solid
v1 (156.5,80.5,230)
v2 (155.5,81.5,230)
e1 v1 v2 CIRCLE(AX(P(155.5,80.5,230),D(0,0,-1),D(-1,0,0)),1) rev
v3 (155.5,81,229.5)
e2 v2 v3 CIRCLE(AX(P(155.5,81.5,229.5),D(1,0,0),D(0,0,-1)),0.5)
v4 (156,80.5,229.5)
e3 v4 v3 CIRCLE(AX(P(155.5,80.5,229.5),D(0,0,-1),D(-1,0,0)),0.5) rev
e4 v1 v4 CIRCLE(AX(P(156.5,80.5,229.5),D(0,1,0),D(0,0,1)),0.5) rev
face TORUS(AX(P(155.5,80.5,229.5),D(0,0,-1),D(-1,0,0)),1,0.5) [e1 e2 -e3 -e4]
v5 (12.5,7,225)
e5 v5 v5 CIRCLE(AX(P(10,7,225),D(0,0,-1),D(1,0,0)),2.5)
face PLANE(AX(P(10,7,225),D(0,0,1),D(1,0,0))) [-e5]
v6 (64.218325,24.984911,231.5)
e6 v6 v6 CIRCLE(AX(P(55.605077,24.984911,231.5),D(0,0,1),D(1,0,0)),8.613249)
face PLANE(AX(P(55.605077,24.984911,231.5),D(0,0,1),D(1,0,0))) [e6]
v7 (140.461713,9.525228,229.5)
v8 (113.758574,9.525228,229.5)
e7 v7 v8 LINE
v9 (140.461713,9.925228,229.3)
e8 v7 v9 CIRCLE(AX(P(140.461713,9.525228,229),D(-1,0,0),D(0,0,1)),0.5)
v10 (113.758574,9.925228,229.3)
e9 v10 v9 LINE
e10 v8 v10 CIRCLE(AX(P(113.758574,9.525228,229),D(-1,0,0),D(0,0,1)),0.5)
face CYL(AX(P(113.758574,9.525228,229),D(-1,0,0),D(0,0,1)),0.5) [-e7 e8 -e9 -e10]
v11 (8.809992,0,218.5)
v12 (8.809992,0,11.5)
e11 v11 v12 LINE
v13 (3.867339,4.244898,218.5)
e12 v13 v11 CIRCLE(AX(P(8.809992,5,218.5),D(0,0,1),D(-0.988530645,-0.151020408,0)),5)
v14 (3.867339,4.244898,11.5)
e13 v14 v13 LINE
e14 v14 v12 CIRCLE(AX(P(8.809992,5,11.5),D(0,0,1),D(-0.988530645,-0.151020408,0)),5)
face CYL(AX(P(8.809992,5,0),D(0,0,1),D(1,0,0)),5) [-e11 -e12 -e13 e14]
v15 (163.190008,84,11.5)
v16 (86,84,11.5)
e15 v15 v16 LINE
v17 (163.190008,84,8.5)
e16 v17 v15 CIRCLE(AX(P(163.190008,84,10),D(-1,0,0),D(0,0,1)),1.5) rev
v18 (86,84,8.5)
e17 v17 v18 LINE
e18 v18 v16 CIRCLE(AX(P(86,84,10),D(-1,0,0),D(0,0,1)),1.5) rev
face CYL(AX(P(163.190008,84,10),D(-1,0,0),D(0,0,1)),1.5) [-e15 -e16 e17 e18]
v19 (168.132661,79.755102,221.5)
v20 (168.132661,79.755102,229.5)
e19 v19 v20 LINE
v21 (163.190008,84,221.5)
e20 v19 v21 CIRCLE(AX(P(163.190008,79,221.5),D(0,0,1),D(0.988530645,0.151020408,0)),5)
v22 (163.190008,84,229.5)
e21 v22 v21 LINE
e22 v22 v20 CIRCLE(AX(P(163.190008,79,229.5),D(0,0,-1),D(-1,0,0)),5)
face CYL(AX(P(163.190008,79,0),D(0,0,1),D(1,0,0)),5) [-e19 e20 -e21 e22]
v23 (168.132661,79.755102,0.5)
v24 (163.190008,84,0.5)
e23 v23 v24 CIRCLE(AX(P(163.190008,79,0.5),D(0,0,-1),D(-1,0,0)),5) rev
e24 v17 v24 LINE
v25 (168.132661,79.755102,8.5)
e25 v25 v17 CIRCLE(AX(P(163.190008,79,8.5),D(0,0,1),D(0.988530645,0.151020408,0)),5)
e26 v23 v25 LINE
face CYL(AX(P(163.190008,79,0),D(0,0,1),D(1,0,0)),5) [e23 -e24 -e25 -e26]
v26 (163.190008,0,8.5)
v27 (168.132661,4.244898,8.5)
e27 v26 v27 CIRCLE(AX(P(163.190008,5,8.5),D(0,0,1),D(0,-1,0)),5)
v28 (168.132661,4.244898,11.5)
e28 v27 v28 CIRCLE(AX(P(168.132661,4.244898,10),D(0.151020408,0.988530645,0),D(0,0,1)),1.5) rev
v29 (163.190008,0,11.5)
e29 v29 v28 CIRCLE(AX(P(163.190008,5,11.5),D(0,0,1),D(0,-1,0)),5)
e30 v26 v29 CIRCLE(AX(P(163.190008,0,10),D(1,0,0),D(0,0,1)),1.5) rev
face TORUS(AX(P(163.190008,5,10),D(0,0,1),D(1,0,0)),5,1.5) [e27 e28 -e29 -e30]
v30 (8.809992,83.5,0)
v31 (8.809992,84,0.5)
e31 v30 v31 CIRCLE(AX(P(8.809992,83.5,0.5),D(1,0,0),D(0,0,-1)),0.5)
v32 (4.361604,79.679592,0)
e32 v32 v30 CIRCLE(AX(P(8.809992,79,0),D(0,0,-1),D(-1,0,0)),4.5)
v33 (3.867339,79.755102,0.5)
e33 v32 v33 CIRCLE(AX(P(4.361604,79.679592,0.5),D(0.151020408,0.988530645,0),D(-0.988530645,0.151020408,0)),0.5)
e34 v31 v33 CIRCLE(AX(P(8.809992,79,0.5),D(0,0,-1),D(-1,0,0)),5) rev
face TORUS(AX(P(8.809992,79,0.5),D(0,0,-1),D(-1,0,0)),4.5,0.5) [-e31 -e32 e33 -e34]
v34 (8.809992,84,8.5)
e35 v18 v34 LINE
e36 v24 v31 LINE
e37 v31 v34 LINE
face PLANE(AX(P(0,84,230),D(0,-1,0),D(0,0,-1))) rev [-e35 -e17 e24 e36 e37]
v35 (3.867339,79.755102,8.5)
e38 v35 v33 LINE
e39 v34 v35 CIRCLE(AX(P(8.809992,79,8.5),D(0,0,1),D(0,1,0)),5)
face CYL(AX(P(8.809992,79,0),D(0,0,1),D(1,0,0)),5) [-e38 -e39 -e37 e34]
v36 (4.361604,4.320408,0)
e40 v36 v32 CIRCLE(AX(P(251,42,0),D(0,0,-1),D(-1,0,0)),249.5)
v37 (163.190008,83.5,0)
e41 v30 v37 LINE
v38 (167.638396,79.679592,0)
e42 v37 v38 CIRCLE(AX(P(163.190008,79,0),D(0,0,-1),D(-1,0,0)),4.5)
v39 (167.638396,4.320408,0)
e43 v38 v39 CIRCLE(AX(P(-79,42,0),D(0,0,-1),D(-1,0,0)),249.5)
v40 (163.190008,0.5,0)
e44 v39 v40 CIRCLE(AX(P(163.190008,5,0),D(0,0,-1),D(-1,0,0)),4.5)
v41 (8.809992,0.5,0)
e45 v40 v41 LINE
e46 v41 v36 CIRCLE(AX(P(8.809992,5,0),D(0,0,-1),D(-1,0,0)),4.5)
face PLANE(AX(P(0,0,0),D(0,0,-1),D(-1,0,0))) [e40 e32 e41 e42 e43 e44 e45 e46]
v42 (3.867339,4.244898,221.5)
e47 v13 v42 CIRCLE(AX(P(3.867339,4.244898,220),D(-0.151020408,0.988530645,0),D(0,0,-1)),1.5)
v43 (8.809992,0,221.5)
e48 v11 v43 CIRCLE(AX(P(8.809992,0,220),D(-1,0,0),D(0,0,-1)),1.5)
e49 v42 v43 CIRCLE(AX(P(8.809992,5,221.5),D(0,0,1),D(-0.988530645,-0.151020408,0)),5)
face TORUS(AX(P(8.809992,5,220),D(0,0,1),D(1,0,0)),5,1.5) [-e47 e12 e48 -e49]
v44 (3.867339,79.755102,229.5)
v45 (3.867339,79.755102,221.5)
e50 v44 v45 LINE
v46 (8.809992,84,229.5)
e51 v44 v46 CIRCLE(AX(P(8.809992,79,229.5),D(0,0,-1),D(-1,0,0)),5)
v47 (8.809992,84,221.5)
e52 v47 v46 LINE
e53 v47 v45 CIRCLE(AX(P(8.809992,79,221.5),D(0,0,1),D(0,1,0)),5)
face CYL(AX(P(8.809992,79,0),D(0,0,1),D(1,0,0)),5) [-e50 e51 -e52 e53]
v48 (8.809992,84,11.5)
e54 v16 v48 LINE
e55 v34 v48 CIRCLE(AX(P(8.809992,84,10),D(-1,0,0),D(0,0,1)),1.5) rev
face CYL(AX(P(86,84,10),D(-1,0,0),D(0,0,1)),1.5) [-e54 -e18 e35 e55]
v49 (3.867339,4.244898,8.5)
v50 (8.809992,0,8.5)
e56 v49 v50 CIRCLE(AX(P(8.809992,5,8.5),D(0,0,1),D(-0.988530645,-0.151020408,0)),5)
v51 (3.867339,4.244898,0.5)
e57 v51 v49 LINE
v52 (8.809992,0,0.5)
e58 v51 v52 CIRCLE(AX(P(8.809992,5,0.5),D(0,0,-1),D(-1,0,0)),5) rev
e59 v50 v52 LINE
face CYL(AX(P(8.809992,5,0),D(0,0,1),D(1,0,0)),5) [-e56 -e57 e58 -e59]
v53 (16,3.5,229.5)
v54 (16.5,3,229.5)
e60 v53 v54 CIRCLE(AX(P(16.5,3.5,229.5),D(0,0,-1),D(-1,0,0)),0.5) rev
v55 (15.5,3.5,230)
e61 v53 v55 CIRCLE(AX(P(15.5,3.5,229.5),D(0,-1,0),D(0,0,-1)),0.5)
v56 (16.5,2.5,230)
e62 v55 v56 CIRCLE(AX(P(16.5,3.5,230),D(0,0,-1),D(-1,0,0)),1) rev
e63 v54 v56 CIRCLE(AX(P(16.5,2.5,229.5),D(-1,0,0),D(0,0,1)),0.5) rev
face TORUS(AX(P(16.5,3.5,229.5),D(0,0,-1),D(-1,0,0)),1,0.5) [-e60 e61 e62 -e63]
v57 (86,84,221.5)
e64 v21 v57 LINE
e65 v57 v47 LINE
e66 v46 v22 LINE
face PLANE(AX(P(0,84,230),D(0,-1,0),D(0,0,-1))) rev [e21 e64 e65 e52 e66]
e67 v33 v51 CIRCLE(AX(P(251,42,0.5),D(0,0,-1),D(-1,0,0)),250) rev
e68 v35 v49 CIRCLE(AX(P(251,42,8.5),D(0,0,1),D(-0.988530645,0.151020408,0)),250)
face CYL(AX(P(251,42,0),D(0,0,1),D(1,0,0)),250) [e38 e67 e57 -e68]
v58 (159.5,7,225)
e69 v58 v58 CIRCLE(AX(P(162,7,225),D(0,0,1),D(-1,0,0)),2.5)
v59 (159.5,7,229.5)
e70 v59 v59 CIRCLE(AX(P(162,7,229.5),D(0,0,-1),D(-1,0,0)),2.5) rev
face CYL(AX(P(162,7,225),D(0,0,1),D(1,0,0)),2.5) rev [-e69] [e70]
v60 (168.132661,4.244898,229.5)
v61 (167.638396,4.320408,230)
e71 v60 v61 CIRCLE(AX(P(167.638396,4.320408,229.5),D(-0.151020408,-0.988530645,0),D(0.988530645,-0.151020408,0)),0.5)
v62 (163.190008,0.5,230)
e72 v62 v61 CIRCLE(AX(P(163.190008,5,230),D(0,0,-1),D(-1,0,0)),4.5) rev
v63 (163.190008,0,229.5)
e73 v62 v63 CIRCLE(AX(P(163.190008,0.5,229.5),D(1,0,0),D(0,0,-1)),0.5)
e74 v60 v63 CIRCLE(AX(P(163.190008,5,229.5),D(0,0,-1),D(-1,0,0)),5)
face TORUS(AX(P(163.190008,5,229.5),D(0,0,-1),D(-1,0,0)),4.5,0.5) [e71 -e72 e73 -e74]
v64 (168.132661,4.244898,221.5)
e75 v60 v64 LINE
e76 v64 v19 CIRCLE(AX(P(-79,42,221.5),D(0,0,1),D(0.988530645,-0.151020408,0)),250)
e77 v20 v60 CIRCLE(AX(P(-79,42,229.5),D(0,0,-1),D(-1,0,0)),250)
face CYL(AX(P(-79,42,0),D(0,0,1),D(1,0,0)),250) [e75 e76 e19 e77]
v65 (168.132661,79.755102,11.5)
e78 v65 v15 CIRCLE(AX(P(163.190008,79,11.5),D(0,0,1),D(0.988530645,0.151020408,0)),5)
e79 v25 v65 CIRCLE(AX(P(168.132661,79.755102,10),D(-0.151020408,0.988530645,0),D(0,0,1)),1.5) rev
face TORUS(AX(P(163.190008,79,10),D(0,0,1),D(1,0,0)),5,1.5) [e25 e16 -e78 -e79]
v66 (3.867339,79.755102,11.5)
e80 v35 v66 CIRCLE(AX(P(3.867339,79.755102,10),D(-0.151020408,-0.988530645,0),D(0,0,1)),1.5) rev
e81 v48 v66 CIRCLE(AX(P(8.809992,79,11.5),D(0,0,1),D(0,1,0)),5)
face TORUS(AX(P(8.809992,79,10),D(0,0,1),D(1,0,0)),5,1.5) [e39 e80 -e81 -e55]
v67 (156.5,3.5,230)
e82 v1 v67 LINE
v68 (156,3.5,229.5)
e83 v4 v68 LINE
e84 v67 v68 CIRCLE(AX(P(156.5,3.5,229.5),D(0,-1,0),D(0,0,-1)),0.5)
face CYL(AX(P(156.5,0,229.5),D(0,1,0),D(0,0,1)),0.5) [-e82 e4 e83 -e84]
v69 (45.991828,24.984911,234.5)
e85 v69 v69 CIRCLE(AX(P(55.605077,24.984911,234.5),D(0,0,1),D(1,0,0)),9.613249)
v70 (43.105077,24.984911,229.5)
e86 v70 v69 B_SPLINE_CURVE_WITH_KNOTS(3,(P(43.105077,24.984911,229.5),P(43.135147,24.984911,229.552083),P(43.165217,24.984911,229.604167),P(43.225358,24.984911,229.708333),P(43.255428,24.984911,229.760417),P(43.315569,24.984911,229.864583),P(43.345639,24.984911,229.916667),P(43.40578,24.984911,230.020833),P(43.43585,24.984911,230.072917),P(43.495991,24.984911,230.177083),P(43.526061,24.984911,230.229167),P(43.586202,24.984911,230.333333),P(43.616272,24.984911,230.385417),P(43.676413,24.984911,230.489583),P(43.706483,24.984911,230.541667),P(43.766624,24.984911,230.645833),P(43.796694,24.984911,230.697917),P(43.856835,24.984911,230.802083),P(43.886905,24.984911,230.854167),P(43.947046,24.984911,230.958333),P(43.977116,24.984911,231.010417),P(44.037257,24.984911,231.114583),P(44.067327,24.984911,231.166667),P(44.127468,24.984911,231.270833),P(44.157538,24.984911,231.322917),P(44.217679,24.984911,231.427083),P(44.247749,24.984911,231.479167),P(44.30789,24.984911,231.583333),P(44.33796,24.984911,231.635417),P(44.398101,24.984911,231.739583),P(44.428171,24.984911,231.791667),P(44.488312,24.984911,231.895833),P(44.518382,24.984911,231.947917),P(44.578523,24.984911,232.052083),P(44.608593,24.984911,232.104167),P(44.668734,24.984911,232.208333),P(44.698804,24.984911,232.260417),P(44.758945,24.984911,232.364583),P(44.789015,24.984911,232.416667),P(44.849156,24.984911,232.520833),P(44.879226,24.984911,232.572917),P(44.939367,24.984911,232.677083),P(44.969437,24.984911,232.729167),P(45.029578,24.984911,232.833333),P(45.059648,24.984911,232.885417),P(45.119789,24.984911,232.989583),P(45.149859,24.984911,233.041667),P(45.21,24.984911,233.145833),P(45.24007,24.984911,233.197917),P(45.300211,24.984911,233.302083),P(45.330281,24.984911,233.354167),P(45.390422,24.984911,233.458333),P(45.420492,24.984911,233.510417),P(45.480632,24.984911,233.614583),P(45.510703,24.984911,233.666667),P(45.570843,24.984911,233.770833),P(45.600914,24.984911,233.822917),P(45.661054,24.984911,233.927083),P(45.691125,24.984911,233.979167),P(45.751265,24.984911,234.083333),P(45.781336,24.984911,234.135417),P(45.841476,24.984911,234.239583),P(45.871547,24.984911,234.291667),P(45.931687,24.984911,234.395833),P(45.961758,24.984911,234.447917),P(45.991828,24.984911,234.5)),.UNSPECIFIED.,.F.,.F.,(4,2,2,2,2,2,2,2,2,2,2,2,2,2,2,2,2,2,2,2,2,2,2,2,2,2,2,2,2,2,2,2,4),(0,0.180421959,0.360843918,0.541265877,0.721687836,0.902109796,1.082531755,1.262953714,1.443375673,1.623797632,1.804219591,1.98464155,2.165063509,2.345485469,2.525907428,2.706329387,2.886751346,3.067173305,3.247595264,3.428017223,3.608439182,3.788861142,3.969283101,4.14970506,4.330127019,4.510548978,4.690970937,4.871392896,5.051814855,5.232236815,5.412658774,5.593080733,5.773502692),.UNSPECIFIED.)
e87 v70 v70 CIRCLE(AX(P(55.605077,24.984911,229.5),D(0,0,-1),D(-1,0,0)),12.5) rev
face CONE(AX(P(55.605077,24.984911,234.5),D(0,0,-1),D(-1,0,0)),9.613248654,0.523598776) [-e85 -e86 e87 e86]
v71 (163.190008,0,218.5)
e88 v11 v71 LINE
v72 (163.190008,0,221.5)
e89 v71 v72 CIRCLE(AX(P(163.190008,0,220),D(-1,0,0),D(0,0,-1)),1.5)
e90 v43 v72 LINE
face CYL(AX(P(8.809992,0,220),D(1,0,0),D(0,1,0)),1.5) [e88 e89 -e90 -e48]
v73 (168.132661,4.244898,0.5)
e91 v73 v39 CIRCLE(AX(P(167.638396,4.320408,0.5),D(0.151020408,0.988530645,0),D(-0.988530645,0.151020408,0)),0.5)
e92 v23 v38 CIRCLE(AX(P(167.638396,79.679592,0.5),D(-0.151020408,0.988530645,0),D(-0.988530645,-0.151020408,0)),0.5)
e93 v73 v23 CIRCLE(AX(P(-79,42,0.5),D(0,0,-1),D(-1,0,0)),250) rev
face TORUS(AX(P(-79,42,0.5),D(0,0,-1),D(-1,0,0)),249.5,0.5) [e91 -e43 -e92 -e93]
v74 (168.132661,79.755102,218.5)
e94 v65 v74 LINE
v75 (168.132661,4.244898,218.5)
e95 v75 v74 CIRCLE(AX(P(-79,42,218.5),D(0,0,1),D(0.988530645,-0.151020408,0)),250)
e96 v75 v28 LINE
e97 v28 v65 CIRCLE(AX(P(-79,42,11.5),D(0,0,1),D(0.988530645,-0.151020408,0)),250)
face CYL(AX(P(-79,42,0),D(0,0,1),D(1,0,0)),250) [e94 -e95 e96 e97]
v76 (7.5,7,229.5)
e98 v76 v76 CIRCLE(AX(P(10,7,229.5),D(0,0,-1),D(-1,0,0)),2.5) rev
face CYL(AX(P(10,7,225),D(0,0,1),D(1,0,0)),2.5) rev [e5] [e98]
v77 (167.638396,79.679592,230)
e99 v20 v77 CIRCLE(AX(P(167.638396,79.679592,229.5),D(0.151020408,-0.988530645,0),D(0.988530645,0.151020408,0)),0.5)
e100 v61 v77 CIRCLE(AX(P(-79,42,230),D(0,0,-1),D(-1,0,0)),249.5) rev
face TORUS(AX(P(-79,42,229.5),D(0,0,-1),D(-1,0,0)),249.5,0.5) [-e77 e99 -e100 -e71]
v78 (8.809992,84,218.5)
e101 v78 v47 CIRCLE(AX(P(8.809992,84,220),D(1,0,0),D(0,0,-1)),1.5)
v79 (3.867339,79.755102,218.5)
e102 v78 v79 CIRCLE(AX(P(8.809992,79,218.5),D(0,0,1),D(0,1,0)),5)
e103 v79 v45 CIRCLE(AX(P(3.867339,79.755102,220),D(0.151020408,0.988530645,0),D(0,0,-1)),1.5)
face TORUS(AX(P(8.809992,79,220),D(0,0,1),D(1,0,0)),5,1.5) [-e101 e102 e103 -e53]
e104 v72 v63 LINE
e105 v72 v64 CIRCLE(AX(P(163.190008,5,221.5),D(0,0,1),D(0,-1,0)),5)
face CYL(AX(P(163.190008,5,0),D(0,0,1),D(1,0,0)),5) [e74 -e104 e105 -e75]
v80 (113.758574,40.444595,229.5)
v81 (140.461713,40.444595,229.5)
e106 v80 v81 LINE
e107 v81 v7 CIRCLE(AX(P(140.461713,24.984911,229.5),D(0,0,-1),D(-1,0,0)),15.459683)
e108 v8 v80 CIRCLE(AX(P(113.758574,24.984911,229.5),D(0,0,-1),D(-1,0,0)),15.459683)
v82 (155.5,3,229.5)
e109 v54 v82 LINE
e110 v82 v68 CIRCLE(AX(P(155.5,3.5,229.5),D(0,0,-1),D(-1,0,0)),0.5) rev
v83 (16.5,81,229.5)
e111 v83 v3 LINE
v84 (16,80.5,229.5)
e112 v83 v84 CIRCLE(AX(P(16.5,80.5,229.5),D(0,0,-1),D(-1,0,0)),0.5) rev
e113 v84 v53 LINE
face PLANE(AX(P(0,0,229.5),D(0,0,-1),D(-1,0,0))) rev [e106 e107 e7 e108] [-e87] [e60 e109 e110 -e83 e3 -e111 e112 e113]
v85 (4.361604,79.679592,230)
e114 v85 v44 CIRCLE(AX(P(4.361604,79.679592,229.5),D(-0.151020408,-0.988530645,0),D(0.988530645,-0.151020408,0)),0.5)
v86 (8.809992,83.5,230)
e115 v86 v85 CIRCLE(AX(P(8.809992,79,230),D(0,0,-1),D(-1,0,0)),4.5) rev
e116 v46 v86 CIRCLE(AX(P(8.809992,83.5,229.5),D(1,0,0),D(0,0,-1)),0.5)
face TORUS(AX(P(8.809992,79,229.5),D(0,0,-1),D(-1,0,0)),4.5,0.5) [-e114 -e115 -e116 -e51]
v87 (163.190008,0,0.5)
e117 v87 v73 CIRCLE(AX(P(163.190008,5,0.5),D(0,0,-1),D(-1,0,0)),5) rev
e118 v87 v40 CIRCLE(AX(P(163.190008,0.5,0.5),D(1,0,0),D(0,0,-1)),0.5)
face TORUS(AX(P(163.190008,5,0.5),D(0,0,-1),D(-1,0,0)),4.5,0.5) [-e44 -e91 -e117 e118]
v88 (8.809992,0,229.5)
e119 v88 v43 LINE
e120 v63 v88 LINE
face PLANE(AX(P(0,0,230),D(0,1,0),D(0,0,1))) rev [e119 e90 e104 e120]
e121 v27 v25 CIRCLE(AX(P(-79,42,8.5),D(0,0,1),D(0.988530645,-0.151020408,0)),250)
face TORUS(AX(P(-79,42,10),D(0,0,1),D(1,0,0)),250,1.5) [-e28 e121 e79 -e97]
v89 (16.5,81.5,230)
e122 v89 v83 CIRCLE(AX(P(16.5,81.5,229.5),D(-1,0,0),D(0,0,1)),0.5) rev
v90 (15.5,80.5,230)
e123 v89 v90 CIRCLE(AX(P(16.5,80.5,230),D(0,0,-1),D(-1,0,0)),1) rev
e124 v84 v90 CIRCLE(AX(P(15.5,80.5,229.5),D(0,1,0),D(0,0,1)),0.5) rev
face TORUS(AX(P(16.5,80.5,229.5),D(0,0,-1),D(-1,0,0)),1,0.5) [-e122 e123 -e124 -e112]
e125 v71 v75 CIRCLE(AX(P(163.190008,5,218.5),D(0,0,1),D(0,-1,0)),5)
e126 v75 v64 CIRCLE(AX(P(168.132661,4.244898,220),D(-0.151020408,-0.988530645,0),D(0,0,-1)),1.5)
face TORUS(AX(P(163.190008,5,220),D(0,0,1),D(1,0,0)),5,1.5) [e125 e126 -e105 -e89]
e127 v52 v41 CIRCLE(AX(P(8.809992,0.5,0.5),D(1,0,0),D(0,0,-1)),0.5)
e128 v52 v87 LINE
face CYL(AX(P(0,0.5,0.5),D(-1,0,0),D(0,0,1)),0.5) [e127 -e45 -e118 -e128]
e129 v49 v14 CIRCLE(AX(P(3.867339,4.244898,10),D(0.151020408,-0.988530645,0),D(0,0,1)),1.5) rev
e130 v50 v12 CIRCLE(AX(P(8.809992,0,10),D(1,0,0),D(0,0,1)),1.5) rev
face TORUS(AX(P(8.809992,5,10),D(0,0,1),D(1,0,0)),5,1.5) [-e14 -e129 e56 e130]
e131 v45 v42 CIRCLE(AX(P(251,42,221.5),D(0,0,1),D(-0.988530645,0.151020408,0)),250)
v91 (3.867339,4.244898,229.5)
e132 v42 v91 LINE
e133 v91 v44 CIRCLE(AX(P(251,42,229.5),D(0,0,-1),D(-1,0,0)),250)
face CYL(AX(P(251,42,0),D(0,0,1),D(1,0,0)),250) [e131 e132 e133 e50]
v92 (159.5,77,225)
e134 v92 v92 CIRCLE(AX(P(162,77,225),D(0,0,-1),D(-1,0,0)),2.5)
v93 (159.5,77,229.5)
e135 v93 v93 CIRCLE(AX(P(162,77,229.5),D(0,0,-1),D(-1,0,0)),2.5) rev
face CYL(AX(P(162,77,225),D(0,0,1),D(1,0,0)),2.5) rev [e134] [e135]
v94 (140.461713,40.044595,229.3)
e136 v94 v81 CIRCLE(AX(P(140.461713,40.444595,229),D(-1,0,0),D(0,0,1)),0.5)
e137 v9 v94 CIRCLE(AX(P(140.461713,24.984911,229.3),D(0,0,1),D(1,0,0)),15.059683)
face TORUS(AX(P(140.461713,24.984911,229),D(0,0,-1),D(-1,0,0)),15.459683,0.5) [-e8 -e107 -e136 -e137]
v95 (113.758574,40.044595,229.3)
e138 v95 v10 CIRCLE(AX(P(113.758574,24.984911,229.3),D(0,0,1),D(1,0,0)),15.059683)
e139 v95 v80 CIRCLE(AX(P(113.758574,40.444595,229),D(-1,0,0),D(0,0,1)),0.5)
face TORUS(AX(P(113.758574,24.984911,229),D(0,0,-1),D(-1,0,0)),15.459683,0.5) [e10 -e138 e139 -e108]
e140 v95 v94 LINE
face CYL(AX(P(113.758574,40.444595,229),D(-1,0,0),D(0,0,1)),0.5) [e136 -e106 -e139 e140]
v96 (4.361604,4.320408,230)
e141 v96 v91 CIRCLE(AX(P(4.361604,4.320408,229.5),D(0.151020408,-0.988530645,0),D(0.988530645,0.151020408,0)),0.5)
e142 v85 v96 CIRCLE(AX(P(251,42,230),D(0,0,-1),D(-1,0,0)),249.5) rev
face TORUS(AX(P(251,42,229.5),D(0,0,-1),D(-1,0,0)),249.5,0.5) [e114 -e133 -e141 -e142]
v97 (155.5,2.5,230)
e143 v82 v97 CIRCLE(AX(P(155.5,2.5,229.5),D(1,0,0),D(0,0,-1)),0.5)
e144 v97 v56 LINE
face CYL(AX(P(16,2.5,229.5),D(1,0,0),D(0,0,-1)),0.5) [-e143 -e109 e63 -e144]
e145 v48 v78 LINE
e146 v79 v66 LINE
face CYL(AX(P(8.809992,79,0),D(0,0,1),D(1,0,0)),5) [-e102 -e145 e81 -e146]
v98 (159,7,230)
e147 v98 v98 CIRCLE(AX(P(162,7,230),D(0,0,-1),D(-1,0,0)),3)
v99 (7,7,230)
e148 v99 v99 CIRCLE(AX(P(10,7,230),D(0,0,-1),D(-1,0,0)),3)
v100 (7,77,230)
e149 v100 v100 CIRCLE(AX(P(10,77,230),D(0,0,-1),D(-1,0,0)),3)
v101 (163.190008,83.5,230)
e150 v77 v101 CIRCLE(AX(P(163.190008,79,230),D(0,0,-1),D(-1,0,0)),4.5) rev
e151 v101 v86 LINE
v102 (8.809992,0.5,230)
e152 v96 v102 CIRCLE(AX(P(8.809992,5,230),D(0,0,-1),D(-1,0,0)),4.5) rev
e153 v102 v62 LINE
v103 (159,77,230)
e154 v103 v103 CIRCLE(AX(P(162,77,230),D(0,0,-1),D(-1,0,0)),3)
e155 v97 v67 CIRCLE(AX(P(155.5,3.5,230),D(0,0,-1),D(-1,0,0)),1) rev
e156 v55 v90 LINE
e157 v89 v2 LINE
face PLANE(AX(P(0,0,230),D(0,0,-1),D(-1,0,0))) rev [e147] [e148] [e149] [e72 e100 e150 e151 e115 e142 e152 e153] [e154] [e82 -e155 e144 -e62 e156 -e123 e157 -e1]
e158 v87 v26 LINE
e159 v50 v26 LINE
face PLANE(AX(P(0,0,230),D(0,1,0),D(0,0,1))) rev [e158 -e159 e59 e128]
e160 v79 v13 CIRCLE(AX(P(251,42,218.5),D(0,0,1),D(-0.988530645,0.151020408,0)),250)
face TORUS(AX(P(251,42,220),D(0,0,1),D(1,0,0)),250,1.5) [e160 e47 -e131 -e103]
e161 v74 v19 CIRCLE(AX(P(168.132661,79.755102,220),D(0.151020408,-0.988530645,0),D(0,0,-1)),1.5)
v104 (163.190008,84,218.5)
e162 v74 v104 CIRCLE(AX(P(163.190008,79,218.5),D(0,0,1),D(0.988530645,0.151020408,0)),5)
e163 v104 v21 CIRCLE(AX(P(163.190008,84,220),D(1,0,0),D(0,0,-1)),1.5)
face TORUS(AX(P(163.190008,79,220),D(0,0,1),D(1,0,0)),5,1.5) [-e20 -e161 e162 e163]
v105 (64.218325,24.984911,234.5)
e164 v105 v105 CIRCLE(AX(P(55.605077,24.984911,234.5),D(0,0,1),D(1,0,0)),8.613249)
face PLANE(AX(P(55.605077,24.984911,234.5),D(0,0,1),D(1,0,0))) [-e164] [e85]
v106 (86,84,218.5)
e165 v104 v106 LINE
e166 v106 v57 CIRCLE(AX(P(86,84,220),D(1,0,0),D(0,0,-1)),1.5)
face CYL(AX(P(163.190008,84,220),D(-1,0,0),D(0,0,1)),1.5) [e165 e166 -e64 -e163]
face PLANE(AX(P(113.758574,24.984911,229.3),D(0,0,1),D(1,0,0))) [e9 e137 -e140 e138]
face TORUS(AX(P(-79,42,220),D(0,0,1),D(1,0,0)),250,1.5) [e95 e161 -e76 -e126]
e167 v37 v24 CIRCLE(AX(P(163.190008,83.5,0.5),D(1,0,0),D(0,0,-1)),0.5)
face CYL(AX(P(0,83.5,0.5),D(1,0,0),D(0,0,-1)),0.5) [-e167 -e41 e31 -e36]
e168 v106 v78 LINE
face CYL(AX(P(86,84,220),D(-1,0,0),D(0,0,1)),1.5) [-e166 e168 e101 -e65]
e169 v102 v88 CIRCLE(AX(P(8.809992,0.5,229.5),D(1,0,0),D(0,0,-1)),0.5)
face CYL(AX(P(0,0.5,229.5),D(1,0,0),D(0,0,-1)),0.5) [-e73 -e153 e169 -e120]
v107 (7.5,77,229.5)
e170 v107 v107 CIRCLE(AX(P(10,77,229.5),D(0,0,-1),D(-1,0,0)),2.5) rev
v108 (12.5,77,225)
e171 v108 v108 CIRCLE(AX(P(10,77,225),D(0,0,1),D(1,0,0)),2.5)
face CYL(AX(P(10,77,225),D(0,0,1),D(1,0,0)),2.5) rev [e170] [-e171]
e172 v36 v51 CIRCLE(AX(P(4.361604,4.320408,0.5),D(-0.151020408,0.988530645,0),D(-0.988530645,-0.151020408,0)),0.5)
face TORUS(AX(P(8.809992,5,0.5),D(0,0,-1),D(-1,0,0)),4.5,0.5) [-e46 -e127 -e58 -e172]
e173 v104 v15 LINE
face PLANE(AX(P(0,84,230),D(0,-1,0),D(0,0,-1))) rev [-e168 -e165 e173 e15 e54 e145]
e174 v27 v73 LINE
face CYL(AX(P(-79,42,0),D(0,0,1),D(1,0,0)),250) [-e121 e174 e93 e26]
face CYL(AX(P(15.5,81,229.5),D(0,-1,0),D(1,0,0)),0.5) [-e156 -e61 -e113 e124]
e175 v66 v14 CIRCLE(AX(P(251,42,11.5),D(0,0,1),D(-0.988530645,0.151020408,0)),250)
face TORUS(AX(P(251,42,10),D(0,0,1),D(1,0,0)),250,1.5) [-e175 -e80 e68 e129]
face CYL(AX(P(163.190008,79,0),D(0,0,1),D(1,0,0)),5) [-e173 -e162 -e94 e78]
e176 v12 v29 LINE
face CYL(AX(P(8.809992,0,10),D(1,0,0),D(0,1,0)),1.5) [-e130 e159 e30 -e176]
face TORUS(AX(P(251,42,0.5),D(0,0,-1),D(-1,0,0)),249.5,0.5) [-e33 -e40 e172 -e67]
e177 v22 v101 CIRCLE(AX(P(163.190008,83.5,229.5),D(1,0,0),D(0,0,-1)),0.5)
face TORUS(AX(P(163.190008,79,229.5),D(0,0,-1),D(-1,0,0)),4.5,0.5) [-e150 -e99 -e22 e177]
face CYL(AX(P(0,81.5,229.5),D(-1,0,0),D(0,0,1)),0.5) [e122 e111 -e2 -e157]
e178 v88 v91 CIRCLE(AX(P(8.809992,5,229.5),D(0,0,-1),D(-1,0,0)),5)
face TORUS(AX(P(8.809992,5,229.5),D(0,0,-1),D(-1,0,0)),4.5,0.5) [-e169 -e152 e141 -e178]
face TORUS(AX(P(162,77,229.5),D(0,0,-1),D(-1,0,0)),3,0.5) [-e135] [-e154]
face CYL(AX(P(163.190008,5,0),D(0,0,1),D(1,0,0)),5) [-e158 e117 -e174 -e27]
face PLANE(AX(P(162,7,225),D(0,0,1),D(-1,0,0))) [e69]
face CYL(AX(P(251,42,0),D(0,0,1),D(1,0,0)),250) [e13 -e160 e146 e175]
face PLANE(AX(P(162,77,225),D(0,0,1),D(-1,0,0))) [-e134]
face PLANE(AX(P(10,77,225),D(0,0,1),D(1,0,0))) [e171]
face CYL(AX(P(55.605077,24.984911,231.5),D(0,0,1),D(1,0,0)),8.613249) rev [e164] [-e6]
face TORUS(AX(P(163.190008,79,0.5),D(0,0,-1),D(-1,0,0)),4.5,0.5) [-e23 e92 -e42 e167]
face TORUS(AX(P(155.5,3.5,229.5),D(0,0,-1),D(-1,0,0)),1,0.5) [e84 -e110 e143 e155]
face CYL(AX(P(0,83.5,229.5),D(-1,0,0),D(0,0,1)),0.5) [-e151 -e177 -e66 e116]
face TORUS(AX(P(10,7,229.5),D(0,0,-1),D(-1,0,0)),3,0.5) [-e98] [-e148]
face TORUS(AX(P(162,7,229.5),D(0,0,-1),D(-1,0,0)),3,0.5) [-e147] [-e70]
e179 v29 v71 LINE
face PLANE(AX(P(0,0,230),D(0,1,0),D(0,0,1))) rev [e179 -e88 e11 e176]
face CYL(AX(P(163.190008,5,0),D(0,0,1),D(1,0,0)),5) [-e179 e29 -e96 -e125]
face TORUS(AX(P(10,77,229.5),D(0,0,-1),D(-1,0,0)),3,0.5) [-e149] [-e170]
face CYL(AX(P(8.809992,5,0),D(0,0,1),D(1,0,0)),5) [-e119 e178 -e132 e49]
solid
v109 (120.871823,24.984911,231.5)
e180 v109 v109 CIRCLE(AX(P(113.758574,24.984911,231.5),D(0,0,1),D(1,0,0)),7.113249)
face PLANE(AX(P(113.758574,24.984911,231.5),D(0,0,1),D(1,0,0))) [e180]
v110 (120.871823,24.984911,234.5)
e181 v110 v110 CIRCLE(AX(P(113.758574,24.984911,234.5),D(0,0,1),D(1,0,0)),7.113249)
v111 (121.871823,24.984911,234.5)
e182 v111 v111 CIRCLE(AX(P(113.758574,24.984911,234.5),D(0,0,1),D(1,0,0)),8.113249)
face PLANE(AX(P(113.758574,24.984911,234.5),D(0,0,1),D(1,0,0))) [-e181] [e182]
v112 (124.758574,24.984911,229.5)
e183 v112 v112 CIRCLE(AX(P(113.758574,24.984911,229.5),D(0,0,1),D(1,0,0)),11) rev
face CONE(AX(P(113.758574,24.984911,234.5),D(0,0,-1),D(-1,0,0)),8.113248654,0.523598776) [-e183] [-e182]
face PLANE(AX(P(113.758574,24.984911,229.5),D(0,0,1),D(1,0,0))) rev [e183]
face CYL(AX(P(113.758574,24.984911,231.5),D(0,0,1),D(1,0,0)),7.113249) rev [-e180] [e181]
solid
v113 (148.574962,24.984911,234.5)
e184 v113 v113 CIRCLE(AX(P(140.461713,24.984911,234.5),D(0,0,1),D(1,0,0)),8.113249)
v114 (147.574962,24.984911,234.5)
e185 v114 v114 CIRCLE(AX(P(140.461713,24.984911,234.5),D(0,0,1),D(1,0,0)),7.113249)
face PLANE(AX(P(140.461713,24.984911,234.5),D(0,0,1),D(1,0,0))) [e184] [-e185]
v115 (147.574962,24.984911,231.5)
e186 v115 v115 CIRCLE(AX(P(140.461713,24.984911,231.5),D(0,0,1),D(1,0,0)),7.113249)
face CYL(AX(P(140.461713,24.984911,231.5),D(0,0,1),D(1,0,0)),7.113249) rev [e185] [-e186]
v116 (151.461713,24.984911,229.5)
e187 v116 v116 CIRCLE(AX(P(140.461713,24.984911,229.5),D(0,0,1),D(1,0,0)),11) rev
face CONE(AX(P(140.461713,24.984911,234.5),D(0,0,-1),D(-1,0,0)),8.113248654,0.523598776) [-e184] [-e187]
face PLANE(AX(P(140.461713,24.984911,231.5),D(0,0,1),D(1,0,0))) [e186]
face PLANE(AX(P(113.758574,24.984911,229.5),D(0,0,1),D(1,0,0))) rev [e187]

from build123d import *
from OCP.BRepFilletAPI import BRepFilletAPI_MakeChamfer

# Parameters (mm, degrees)
SKETCH1_W               = 172
SKETCH1_H               = 84
BOSS_EXTRUDE1_DEPTH     = 230
CUT_EXTRUDE1_DEPTH      = 300.232351192
FILLET1_R               = 5
SKETCH5_W               = 140
SKETCH5_H               = 78
CUT_EXTRUDE2_DEPTH      = 0.5
FILLET2_R               = 0.5
FILLET3_R               = 0.5
SKETCH6_R               = 2.5
CUT_EXTRUDE3_DEPTH      = 5
MIRROR4_COPY_1_SKETCH_R = 2.5
MIRROR4_COPY_1_DEPTH    = 5
FILLET4_R               = 0.5
SKETCH7_R               = 11
SKETCH7_R_2             = 12.5
BOSS_EXTRUDE3_DEPTH     = 5
CHAMFER1_SIZE           = 5
CHAMFER1_SIZE_2         = 2.886751346
CUT_EXTRUDE4_DEPTH      = 0.2
SKETCH9_R               = 8.613248654
SKETCH9_R_2             = 7.113248654
CUT_EXTRUDE5_DEPTH      = 3
FILLET5_R               = 0.5


# Some blends are built 0.0001 mm under size
with BuildPart() as part:
    # Sketch1 → Boss-Extrude1 (new body)
    with BuildSketch(Plane.XY):
        with Locations((86, 42)):
            Rectangle(SKETCH1_W, SKETCH1_H)
    extrude(amount=BOSS_EXTRUDE1_DEPTH)

    # Sketch2 → Cut-Extrude1 (cut, through all)
    with BuildSketch(Plane.XY.offset(230)):
        with BuildLine():
            Line((-106.133621178, 127.579331818), (16.103899637, 127.579331818))
            ThreePointArc((16.103899637, 127.579331818), (1.000797644, 41.368476984), (16.53925861, -44.764974195))
            Line((16.53925861, -44.764974195), (-106.133621178, -44.764974195))
            Line((-106.133621178, -44.764974195), (-106.133621178, 127.579331818))
        make_face()
    cut_extrude1 = extrude(amount=-CUT_EXTRUDE1_DEPTH, mode=Mode.SUBTRACT)

    # Mirror1: Cut-Extrude1 across plane
    add(cut_extrude1.mirror(Plane(origin=(86, 0, 0), x_dir=(0, 0, 1), z_dir=(1, 0, 0))), mode=Mode.SUBTRACT)

    # Fillet1
    fillet1_edges = [part.edges().sort_by_distance(p)[0] for p in [
        (4.553251188, 0, 115),
        (4.553251188, 84, 115),
        (167.446748812, 84, 115),
        (167.446748812, 0, 115),
    ]]
    fillet(fillet1_edges, radius=FILLET1_R)

    # Sweep1: sweep along a path in Sketch3
    with BuildLine(Plane.XY.offset(220)) as sweep1_path:
        Line((8.809991948, 0), (163.190008052, 0))
        ThreePointArc((163.190008052, 0), (166.447652123, 1.206880558), (168.132661277, 4.244897959))
        ThreePointArc((168.132661277, 4.244897959), (171, 42), (168.132661277, 79.755102041))
        ThreePointArc((168.132661277, 79.755102041), (166.447652123, 82.793119442), (163.190008052, 84))
        Line((163.190008052, 84), (8.809991948, 84))
        ThreePointArc((8.809991948, 84), (5.552347877, 82.793119442), (3.867338723, 79.755102041))
        ThreePointArc((3.867338723, 79.755102041), (1, 42), (3.867338723, 4.244897959))
        ThreePointArc((3.867338723, 4.244897959), (5.552347877, 1.206880558), (8.809991948, 0))
    # Sketch4 → Sweep1 (sweep)
    with BuildSketch(Plane(origin=(86, 0, 0), x_dir=(0, 0, -1), z_dir=(1, 0, 0))):
        with BuildLine():
            Line((-218.5, 84), (-221.5, 84))
            ThreePointArc((-221.5, 84), (-220, 85.5), (-218.5, 84))
        make_face()
    sweep1 = sweep(path=sweep1_path.line)

    # Mirror2: Sweep1 across plane
    add(sweep1.mirror(Plane.XY.offset(115)))

    # Sketch5 → Cut-Extrude2 (cut)
    with BuildSketch(Plane.XY.offset(230)):
        with Locations((86, 42)):
            Rectangle(SKETCH5_W, SKETCH5_H)
    extrude(amount=-CUT_EXTRUDE2_DEPTH, mode=Mode.SUBTRACT)

    # Fillet2
    fillet2_edges = [part.edges().sort_by_distance(p)[0] for p in [
        (86, 81, 230),
        (16, 81, 229.75),
        (156, 42, 230),
        (156, 81, 229.75),
        (156, 3, 229.75),
        (16, 3, 229.75),
        (16, 42, 230),
        (86, 3, 230),
    ]]
    fillet(fillet2_edges, radius=FILLET2_R - 0.0001)  # a hair under: the kernel refuses the full size

    # Fillet3
    fillet3_edges = [part.edges().sort_by_distance(p)[0] for p in [
        (86, 0, 230),
        (86, 0, 0),
        (86, 84, 0),
        (171, 42, 0),
        (1, 42, 0),
        (5.552347877, 82.793119442, 0),
        (166.447652123, 82.793119442, 0),
        (166.447652123, 1.206880558, 0),
        (5.552347877, 1.206880558, 0),
        (1, 42, 230),
        (171, 42, 230),
        (86, 84, 230),
        (5.552347877, 82.793119442, 230),
        (166.447652123, 82.793119442, 230),
        (166.447652123, 1.206880558, 230),
        (5.552347877, 1.206880558, 230),
    ]]
    fillet(fillet3_edges, radius=FILLET3_R)

    # Sketch6 → Cut-Extrude3 (cut)
    with BuildSketch(Plane.XY.offset(230)):
        with Locations((10, 77)):
            Circle(SKETCH6_R)
    cut_extrude3 = extrude(amount=-CUT_EXTRUDE3_DEPTH, mode=Mode.SUBTRACT)

    # Mirror3: Cut-Extrude3 across plane
    add(cut_extrude3.mirror(Plane(origin=(86, 0, 0), x_dir=(0, 0, 1), z_dir=(1, 0, 0))), mode=Mode.SUBTRACT)

    # Mirror4: Cut-Extrude3 across plane
    add(cut_extrude3.mirror(Plane.ZX.offset(42)), mode=Mode.SUBTRACT)

    # Mirror4 copy 1 sketch → Mirror4 copy 1 (cut)
    with BuildSketch(Plane(origin=(172, 84, 230), x_dir=(-1, 0, 0), z_dir=(0, 0, 1))):
        with Locations((10, 77)):
            Circle(MIRROR4_COPY_1_SKETCH_R)
    extrude(amount=-MIRROR4_COPY_1_DEPTH, mode=Mode.SUBTRACT)

    # Fillet4
    fillet4_edges = [part.edges().sort_by_distance(p)[0] for p in [
        (7.5, 77, 230),
        (164.5, 77, 230),
        (7.5, 7, 230),
        (164.5, 7, 230),
    ]]
    fillet(fillet4_edges, radius=FILLET4_R)

    # Sketch7 → Boss-Extrude3 (add)
    with BuildSketch(Plane.XY.offset(229.5)):
        with Locations(Location((113.758574045, 24.984911334, 0), (0, 0, 180))):
            Circle(SKETCH7_R)
        with Locations(Location((140.461713247, 24.984911334, 0), (0, 0, 180))):
            Circle(SKETCH7_R)
        with Locations(Location((55.605076702, 24.984911334, 0), (0, 0, 180))):
            Circle(SKETCH7_R_2)
    extrude(amount=BOSS_EXTRUDE3_DEPTH)

    # Chamfer1
    chamfer1_edges_1 = [part.edges().sort_by_distance(p)[0] for p in [
        (124.758574045, 24.984911334, 234.5),
    ]]
    chamfer1_side_1 = [part.faces().sort_by_distance(p)[0] for p in [
        (124.758574045, 24.984911334, 234.442264973),
    ]]
    chamfer1_edges_2 = [part.edges().sort_by_distance(p)[0] for p in [
        (151.461713247, 24.984911334, 234.5),
    ]]
    chamfer1_side_2 = [part.faces().sort_by_distance(p)[0] for p in [
        (151.461713247, 24.984911334, 234.442264973),
    ]]
    chamfer1_edges_3 = [part.edges().sort_by_distance(p)[0] for p in [
        (68.105076702, 24.984911334, 234.5),
    ]]
    chamfer1_side_3 = [part.faces().sort_by_distance(p)[0] for p in [
        (68.105076702, 24.984911334, 234.442264973),
    ]]
    chamfer1 = BRepFilletAPI_MakeChamfer(part.part.solid().wrapped)
    for e in chamfer1_edges_1:
        chamfer1.Add(CHAMFER1_SIZE - 0.0001, CHAMFER1_SIZE_2 - 0.0001, e.wrapped, chamfer1_side_1[0].wrapped)
    for e in chamfer1_edges_2:
        chamfer1.Add(CHAMFER1_SIZE - 0.0001, CHAMFER1_SIZE_2 - 0.0001, e.wrapped, chamfer1_side_2[0].wrapped)
    for e in chamfer1_edges_3:
        chamfer1.Add(CHAMFER1_SIZE - 0.0001, CHAMFER1_SIZE_2 - 0.0001, e.wrapped, chamfer1_side_3[0].wrapped)
    add(Compound.cast(chamfer1.Shape()), mode=Mode.REPLACE)  # a hair under: the kernel refuses the full size

    # Sketch8 → Cut-Extrude4 (cut)
    with BuildSketch(Plane.XY.offset(229.5)):
        with BuildLine():
            Line((113.758574045, 40.044594504), (140.461713247, 40.044594504))
            ThreePointArc((140.461713247, 40.044594504), (155.521396417, 24.984911334), (140.461713247, 9.925228165))
            Line((140.461713247, 9.925228165), (113.758574045, 9.925228165))
            ThreePointArc((113.758574045, 9.925228165), (98.698890875, 24.984911334), (113.758574045, 40.044594504))
        make_face()
    extrude(amount=-CUT_EXTRUDE4_DEPTH, mode=Mode.SUBTRACT)


with BuildPart() as cut_extrude4_piece_1:
    # of the separate pieces the step leaves, piece 1, a body of its own (cut_extrude4_pieces)
    add(part.part.solids().sort_by_distance((16.4999, 81, 229.5))[0])


with BuildPart() as cut_extrude4_piece_2:
    # of the separate pieces the step leaves, piece 2, a body of its own (cut_extrude4_pieces)
    add(part.part.solids().sort_by_distance((102.758574045, 24.984911334, 229.5001))[0])


with BuildPart() as cut_extrude4_piece_3:
    # of the separate pieces the step leaves, piece 3, a body of its own (cut_extrude4_pieces)
    add(part.part.solids().sort_by_distance((129.461713247, 24.984911334, 229.5001))[0])


with BuildPart() as cut_extrude5_tool:
    # Sketch9 → Cut-Extrude5 (new body)
    with BuildSketch(Plane.XY.offset(234.5)):
        with Locations((55.605076702, 24.984911334)):
            Circle(SKETCH9_R)
        with Locations((113.758574045, 24.984911334)):
            Circle(SKETCH9_R_2)
        with Locations((140.461713247, 24.984911334)):
            Circle(SKETCH9_R_2)
    extrude(amount=-CUT_EXTRUDE5_DEPTH)


with BuildPart() as cut_extrude4_piece_1_1:
    add(cut_extrude4_piece_1.part)

    # Cut-Extrude5: cut by cut_extrude5_tool
    add(cut_extrude5_tool.part, mode=Mode.SUBTRACT)

    # Fillet5
    # the kernel refuses this fillet: 0.5 mm, written as the material it takes off along each edge
    with BuildSketch(Plane(origin=(113.758574045, 24.984911334, 229.5), x_dir=(0, -1, 0), z_dir=(1, 0, 0))) as fillet5_piece_1:
        with BuildLine():
            CenterArc((15.45968317, 0.5), FILLET5_R, 216.869897645, 53.130102355)
            Line((15.05968317, 0.2), (15.05168317, 0.194))
            ThreePointArc((15.05168317, 0.194), (15.04968317, 0.1), (15.04968317, 0))
            Line((15.04968317, 0), (15.05968317, -0.01))
            Line((15.05968317, -0.01), (15.45968317, -0.01))
            Line((15.45968317, -0.01), (15.45968317, 0))
        make_face()
    revolve(axis=Axis((113.758574045, 24.984911334, 229.5), (0, 0, -1)), revolution_arc=180, mode=Mode.SUBTRACT)
    with BuildSketch(Plane(origin=(140.461713247, 9.925228165, 229.5), x_dir=(0, -1, 0), z_dir=(-1, 0, 0)), Plane(origin=(113.758574045, 40.044594504, 229.5), x_dir=(0, 1, 0), z_dir=(1, 0, 0))) as fillet5_piece_2:
        with BuildLine():
            CenterArc((0.4, -0.5), FILLET5_R, 90, 53.130102355)
            Line((0, -0.2), (-0.008, -0.194))
            ThreePointArc((-0.008, -0.194), (-0.01, -0.1), (-0.01, 0))
            Line((-0.01, 0), (0, 0.01))
            Line((0, 0.01), (0.4, 0.01))
            Line((0.4, 0.01), (0.4, 0))
        make_face()
    extrude(amount=26.703139202, mode=Mode.SUBTRACT)
    with BuildSketch(Plane(origin=(140.461713247, 24.984911334, 229.5), x_dir=(0, 1, 0), z_dir=(-1, 0, 0))) as fillet5_piece_3:
        with BuildLine():
            CenterArc((15.45968317, 0.5), FILLET5_R, 216.869897645, 53.130102355)
            Line((15.05968317, 0.2), (15.05168317, 0.194))
            ThreePointArc((15.05168317, 0.194), (15.04968317, 0.1), (15.04968317, 0))
            Line((15.04968317, 0), (15.05968317, -0.01))
            Line((15.05968317, -0.01), (15.45968317, -0.01))
            Line((15.45968317, -0.01), (15.45968317, 0))
        make_face()
    revolve(axis=Axis((140.461713247, 24.984911334, 229.5), (0, 0, -1)), revolution_arc=180, mode=Mode.SUBTRACT)


with BuildPart() as cut_extrude4_piece_2_1:
    add(cut_extrude4_piece_2.part)

    # Cut-Extrude5: cut by cut_extrude5_tool
    add(cut_extrude5_tool.part, mode=Mode.SUBTRACT)


with BuildPart() as cut_extrude4_piece_3_1:
    add(cut_extrude4_piece_3.part)

    # Cut-Extrude5: cut by cut_extrude5_tool
    add(cut_extrude5_tool.part, mode=Mode.SUBTRACT)


solid = Compound([cut_extrude4_piece_1_1.part, cut_extrude4_piece_2_1.part, cut_extrude4_piece_3_1.part])
